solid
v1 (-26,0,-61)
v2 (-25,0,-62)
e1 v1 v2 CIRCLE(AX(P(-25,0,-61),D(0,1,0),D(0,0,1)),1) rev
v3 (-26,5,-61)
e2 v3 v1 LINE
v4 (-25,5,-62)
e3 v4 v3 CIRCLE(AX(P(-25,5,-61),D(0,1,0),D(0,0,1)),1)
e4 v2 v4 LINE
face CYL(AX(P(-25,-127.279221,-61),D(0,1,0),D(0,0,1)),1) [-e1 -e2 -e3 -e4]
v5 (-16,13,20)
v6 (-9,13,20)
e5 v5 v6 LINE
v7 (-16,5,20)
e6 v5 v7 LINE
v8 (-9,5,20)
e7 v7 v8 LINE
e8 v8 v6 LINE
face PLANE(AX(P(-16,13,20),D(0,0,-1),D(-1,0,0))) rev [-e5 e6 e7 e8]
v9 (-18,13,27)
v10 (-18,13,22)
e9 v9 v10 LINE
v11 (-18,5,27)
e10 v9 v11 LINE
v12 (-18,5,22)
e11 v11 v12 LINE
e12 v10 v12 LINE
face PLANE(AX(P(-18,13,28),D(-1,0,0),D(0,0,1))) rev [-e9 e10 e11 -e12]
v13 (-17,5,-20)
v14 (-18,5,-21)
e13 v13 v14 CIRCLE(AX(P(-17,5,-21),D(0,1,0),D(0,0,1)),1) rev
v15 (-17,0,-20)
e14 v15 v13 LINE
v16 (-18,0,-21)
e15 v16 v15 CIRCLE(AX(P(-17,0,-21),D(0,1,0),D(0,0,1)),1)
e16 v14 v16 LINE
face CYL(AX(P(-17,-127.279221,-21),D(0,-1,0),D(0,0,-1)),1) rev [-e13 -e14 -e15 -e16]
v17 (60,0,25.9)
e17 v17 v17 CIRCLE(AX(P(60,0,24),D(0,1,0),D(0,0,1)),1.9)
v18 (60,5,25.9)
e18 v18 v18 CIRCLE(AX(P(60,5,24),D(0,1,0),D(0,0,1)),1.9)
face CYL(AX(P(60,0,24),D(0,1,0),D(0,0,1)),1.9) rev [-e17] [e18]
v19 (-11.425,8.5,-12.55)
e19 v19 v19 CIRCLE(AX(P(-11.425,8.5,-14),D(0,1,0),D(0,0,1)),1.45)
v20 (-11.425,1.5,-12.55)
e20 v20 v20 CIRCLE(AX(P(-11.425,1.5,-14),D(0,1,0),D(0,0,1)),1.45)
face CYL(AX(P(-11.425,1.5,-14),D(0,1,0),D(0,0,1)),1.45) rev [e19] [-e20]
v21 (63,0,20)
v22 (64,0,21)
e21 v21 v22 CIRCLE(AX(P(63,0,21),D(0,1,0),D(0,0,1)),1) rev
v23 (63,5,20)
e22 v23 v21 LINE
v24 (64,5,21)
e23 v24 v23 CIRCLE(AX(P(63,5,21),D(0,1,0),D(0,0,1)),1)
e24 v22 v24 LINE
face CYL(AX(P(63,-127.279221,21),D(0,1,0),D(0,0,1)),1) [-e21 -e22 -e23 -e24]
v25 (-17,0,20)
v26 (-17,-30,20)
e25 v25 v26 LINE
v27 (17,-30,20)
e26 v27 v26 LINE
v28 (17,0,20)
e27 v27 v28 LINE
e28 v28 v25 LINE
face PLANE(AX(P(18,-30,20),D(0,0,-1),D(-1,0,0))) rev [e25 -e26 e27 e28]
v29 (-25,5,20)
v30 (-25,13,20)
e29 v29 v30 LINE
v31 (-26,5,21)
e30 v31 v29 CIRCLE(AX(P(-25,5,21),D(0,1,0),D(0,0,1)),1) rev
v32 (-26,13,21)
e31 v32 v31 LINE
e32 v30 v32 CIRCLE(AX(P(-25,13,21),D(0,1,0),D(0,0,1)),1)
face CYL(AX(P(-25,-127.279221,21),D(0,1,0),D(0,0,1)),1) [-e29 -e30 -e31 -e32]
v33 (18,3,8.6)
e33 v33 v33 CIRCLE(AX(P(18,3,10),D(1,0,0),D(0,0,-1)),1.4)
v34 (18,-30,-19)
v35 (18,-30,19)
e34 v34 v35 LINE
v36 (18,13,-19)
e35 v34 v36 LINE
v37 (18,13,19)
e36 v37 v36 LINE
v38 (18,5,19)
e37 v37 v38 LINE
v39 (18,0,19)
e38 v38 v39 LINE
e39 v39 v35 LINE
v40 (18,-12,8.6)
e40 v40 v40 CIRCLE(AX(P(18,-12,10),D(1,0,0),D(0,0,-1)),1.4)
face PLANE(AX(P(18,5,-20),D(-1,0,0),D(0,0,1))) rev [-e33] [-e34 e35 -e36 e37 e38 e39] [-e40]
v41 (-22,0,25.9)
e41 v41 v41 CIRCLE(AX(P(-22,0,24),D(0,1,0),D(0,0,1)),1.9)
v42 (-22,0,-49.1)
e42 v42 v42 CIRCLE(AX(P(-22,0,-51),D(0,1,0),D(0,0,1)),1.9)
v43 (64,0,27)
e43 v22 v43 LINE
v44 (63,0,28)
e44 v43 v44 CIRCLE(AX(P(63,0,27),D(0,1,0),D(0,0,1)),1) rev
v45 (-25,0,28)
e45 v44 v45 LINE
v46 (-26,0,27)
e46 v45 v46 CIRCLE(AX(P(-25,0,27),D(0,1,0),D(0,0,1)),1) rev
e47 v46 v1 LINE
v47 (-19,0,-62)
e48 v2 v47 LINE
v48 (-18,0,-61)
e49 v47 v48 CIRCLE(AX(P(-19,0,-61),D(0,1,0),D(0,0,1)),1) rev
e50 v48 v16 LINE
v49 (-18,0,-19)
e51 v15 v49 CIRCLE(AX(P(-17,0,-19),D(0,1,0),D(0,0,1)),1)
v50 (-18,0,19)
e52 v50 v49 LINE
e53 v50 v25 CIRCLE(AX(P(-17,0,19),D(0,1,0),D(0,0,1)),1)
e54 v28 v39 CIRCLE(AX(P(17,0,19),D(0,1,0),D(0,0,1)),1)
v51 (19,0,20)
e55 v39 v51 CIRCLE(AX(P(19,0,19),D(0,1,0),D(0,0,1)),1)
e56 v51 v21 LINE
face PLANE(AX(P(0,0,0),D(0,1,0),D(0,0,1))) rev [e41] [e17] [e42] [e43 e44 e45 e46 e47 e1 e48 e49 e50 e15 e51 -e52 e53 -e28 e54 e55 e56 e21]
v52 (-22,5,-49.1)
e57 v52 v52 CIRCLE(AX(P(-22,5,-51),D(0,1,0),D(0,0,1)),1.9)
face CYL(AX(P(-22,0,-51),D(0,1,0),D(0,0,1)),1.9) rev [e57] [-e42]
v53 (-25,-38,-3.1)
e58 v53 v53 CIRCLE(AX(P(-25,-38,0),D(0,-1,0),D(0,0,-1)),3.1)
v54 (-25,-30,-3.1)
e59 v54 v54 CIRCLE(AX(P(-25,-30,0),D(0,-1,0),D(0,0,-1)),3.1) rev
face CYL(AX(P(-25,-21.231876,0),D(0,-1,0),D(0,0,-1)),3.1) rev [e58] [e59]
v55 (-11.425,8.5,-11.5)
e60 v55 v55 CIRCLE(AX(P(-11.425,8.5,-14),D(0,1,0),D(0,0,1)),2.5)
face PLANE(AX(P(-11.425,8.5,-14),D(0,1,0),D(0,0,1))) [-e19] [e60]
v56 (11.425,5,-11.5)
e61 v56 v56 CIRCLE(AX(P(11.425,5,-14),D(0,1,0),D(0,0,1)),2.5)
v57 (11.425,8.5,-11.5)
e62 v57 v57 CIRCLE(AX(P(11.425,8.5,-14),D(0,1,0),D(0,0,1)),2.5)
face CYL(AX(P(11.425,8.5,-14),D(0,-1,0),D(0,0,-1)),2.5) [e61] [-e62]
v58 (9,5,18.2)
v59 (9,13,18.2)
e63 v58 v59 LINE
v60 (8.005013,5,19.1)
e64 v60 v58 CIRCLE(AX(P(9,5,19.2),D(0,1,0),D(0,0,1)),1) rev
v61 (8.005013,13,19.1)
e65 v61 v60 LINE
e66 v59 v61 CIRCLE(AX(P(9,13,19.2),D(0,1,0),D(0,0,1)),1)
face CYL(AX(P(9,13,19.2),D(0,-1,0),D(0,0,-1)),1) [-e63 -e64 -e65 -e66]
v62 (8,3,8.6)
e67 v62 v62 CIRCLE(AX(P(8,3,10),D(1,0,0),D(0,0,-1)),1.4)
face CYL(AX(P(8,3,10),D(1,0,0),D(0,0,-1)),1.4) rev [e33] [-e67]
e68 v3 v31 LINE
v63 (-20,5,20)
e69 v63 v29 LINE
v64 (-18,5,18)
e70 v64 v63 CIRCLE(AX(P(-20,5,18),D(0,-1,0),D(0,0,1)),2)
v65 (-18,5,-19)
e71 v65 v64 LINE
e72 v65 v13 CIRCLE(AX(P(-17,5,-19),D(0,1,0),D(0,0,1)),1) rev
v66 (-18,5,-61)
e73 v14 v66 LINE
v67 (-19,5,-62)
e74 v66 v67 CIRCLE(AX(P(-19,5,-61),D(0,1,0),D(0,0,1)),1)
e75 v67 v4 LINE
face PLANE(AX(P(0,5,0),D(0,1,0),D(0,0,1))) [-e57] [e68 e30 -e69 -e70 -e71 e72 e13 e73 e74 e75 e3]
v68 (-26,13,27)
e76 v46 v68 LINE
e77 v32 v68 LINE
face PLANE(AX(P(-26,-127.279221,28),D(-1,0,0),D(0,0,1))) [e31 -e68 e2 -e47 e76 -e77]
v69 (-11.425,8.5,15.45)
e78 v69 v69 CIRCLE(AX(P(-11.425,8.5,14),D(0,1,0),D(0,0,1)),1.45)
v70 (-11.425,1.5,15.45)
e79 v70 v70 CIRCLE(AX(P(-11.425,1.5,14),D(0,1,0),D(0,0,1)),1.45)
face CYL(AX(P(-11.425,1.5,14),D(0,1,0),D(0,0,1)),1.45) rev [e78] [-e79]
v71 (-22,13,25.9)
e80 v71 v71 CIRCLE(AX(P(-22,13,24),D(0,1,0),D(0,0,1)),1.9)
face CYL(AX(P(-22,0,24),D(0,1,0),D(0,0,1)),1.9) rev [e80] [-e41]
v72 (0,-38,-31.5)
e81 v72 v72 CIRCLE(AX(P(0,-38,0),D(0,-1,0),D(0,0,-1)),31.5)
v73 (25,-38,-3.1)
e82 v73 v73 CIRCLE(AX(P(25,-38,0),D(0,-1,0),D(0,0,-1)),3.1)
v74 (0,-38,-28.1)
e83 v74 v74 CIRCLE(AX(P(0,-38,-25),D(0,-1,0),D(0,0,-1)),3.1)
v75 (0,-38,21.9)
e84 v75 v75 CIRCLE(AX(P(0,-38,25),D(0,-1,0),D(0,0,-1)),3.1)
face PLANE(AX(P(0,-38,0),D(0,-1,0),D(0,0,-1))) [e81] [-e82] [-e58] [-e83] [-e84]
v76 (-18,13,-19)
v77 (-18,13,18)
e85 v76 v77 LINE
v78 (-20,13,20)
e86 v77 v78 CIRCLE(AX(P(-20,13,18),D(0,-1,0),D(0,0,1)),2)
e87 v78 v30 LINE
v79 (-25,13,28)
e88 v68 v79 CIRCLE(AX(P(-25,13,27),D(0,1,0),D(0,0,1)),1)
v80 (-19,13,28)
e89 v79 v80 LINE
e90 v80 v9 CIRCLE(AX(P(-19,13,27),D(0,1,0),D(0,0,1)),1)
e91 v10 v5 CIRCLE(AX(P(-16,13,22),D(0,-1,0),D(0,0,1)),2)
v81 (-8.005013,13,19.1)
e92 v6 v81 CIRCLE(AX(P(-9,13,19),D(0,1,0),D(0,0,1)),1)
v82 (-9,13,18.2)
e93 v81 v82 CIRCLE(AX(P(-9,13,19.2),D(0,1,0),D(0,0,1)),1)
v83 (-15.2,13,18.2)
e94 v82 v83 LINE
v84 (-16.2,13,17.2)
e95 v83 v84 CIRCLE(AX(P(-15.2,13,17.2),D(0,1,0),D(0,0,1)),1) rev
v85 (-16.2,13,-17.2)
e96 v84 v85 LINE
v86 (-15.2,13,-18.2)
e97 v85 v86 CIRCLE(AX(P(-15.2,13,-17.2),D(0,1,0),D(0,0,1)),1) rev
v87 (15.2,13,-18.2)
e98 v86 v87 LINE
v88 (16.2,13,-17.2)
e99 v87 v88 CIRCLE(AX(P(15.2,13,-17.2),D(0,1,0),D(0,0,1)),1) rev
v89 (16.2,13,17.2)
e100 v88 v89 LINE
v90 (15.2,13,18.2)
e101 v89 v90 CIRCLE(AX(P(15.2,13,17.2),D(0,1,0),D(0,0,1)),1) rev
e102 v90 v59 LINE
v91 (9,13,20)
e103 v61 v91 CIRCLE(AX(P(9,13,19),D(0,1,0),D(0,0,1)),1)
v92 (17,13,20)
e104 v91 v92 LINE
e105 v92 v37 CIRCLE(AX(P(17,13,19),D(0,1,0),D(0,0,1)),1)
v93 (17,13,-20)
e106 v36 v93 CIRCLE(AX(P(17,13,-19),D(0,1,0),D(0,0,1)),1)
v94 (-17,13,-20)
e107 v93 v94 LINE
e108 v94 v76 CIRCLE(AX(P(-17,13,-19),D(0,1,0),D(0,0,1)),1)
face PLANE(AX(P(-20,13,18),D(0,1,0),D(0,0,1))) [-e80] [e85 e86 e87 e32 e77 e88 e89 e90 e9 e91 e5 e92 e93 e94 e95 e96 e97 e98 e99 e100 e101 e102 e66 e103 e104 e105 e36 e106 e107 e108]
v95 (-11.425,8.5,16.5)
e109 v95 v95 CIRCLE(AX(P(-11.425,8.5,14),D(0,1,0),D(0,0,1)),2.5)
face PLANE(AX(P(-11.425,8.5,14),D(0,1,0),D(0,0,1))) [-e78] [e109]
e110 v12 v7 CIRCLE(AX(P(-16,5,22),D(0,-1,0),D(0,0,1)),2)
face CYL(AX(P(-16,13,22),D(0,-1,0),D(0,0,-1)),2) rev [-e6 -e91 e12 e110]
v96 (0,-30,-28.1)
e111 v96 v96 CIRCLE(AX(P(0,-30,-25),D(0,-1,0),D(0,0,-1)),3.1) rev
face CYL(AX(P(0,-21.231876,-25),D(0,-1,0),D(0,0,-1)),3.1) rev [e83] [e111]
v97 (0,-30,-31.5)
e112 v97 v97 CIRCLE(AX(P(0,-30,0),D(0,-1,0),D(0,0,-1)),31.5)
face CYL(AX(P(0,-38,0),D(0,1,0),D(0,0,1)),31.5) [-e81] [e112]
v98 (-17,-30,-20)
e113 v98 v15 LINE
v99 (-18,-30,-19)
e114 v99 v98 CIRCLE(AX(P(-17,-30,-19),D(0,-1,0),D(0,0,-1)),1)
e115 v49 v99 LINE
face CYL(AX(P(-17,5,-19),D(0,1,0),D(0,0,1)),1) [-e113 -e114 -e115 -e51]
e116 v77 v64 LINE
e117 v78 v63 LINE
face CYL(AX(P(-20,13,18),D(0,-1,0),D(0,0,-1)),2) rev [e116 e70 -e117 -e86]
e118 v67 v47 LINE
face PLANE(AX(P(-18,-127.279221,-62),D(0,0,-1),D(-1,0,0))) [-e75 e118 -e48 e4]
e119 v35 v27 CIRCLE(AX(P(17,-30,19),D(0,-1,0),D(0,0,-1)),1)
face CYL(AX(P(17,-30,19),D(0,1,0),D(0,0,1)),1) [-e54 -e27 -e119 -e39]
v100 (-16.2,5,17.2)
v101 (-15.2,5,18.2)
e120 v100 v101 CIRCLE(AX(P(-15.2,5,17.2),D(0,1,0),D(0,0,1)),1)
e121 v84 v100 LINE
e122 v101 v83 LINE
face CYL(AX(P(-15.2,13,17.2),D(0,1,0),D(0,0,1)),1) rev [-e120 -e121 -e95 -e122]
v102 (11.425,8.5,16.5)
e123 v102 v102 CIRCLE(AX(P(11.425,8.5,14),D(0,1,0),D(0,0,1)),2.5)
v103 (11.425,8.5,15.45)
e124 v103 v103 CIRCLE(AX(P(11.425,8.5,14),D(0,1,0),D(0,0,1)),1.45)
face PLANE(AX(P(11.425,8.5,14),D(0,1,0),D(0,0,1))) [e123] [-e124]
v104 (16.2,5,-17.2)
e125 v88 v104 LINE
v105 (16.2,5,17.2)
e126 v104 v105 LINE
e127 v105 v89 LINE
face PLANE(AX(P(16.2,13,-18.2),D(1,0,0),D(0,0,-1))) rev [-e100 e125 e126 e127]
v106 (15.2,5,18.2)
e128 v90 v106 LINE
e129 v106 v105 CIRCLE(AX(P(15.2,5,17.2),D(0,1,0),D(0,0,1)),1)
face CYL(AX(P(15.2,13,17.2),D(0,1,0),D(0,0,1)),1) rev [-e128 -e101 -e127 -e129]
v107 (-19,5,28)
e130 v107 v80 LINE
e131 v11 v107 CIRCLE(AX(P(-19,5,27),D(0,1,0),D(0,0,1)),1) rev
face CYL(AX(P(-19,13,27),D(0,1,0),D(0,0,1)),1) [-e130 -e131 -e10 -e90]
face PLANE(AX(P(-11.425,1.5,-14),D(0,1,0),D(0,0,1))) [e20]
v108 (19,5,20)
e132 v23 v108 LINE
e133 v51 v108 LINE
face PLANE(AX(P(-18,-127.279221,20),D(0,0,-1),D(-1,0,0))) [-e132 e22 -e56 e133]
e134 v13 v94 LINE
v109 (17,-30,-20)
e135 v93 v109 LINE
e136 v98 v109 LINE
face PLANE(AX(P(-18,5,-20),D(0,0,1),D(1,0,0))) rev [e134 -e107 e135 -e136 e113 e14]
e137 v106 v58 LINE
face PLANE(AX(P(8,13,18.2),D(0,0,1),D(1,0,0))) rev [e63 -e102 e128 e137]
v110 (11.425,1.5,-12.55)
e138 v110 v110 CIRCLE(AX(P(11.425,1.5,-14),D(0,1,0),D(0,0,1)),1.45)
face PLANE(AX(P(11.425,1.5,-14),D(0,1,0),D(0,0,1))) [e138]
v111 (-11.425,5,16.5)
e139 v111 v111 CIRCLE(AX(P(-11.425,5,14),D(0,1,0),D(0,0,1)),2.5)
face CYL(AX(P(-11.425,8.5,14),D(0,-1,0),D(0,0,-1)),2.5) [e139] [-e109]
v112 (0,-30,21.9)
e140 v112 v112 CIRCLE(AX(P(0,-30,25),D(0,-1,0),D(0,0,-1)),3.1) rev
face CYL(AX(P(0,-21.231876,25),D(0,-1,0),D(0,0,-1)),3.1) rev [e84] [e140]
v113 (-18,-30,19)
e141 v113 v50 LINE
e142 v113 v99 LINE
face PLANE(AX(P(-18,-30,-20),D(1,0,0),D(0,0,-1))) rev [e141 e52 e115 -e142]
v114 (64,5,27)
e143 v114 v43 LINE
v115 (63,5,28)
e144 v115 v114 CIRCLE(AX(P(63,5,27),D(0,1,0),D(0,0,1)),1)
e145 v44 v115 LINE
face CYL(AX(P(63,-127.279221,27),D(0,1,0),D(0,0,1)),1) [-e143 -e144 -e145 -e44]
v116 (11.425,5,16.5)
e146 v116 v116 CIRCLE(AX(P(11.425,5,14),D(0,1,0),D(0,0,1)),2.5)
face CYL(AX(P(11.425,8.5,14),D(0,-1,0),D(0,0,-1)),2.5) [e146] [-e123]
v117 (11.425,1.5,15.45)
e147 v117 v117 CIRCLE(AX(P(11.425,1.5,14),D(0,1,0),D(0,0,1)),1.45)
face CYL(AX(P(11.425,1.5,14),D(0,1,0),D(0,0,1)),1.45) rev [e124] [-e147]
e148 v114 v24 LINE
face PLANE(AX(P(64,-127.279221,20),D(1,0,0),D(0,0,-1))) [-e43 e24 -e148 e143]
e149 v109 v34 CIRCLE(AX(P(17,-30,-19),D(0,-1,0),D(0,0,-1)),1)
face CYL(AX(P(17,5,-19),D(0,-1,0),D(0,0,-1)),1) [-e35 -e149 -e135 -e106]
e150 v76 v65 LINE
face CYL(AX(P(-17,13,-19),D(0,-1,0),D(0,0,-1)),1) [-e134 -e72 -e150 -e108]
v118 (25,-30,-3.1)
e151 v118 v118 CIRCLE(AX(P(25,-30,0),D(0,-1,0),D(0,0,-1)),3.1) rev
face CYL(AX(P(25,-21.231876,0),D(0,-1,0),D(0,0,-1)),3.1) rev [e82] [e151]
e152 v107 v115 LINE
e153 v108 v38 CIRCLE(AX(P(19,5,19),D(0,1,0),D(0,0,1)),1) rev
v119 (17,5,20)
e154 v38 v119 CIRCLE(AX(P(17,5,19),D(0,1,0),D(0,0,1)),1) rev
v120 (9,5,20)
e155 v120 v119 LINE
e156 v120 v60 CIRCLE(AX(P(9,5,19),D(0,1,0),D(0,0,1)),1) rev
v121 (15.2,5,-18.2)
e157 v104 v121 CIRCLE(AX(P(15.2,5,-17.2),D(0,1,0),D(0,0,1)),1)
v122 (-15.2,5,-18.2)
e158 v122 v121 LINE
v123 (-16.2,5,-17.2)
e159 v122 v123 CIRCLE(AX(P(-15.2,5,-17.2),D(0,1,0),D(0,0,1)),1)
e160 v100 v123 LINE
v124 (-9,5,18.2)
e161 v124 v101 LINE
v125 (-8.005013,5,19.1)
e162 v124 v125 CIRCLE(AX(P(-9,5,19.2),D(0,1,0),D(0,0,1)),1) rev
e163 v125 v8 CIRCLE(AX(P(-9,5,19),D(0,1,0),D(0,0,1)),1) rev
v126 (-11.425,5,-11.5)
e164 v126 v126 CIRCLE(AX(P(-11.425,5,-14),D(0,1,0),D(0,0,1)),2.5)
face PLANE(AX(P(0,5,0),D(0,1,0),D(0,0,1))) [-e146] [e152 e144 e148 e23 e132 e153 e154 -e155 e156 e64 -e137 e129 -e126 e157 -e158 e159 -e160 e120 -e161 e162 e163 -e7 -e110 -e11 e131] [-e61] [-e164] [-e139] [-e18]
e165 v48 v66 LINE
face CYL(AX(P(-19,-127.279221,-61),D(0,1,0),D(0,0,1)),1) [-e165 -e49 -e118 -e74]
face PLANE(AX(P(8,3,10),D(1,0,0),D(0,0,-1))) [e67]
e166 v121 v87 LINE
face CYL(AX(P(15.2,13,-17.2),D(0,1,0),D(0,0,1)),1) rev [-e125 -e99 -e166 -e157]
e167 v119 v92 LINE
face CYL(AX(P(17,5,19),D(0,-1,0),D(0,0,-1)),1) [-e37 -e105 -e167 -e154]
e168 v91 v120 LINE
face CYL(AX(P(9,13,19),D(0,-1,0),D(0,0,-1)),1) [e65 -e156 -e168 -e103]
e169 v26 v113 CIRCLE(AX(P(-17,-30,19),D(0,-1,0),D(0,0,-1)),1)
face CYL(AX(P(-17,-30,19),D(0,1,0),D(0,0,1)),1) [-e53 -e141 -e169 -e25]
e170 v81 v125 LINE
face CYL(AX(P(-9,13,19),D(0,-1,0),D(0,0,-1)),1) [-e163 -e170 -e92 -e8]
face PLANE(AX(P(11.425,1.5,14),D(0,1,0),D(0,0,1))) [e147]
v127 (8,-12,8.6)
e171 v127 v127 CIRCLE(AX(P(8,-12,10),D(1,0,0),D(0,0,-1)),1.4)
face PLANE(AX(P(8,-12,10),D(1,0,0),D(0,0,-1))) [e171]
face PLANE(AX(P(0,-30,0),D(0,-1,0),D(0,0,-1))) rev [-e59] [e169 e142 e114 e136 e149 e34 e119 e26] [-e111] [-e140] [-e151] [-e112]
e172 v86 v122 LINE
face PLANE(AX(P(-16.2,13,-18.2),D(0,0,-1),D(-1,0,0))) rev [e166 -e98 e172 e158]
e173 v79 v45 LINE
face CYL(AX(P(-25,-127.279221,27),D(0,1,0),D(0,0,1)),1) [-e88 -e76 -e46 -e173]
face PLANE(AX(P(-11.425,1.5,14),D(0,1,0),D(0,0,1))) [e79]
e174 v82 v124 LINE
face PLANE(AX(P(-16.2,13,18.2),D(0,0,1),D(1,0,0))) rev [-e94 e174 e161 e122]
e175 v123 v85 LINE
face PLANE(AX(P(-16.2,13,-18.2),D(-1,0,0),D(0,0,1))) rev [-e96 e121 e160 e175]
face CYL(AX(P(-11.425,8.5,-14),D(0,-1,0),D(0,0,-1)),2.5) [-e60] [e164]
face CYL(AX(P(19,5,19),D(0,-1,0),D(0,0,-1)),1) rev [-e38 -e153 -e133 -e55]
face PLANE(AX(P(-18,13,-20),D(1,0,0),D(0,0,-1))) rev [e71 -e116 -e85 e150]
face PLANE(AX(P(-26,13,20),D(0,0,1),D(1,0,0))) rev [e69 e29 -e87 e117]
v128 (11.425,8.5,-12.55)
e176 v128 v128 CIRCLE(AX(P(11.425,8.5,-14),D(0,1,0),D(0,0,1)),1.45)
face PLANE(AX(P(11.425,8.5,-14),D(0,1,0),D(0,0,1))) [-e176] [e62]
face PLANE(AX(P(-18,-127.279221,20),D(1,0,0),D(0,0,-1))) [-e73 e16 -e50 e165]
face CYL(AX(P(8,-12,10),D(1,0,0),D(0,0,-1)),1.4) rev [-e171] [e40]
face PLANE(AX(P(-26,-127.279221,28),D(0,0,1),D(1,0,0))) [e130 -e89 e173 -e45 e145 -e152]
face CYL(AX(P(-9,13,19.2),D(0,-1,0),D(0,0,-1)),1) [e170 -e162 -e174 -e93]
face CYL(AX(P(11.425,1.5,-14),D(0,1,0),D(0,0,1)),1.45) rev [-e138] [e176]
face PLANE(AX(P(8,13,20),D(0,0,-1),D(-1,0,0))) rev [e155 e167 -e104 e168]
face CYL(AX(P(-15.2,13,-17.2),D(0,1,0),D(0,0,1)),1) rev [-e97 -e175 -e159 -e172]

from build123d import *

# Parameters (mm, degrees)
SKETCH1_W           = 36
SKETCH1_H           = 40
BOSS_EXTRUDE1_DEPTH = 5
BOSS_EXTRUDE2_DEPTH = 5
BOSS_EXTRUDE4_DEPTH = 8
FILLET1_R           = 1
FILLET2_R           = 1
FILLET3_R           = 1
SKETCH4_R           = 1.9
CUT_EXTRUDE1_DEPTH  = 91.049986119
SKETCH5_R           = 2.5
BOSS_EXTRUDE5_DEPTH = 3.5
SKETCH6_R           = 1.45
CUT_EXTRUDE2_DEPTH  = 7
SKETCH7_W           = 36
SKETCH7_H           = 40
BOSS_EXTRUDE6_DEPTH = 30
SKETCH8_R           = 31.5
BOSS_EXTRUDE7_DEPTH = 8
SKETCH9_R           = 3.1
CUT_EXTRUDE3_DEPTH  = 8
FILLET5_R           = 1
FILLET6_R           = 1
SKETCH10_R          = 1.4
CUT_EXTRUDE4_DEPTH  = 10


with BuildPart() as part:
    # Sketch1 → Boss-Extrude1 (new body)
    with BuildSketch(Plane(origin=(0, 0, 0), x_dir=(1, 0, 0), z_dir=(0, 1, 0))):
        Rectangle(SKETCH1_W, SKETCH1_H)
    extrude(amount=BOSS_EXTRUDE1_DEPTH)

    # Sketch2 → Boss-Extrude2 (add)
    with BuildSketch(Plane(origin=(0, 5, 0), x_dir=(1, 0, 0), z_dir=(0, 1, 0))):
        Polygon((-18, -20), (-18, 62), (-26, 62), (-26, -28), (64, -28), (64, -20), align=None)
    extrude(amount=-BOSS_EXTRUDE2_DEPTH)

    # Sketch3 → Boss-Extrude4 (add)
    with BuildSketch(Plane(origin=(0, 5, 0), x_dir=(1, 0, 0), z_dir=(0, 1, 0))):
        with BuildLine():
            Line((-18, 20), (18, 20))
            Line((18, 20), (18, -20))
            Line((18, -20), (8, -20))
            Line((8, -20), (8, -18.2))
            Line((8, -18.2), (16.2, -18.2))
            Line((16.2, -18.2), (16.2, 18.2))
            Line((16.2, 18.2), (-16.2, 18.2))
            Line((-16.2, 18.2), (-16.2, -18.2))
            Line((-16.2, -18.2), (-8, -18.2))
            Line((-8, -18.2), (-8, -20))
            Line((-8, -20), (-16, -20))
            ThreePointArc((-16, -20), (-17.414213562, -20.585786438), (-18, -22))
            Line((-18, -22), (-18, -28))
            Line((-18, -28), (-26, -28))
            Line((-26, -28), (-26, -20))
            Line((-26, -20), (-20, -20))
            ThreePointArc((-20, -20), (-18.585786438, -19.414213562), (-18, -18))
            Line((-18, -18), (-18, 20))
        make_face()
    extrude(amount=BOSS_EXTRUDE4_DEPTH)

    # Fillet1
    # the kernel refuses this fillet: 1 mm, written as the material it adds along each edge
    with BuildSketch(Plane(origin=(16.2, 2.5, 18.2), x_dir=(0, 0, -1), z_dir=(0, 1, 0)), Plane(origin=(16.2, 2.5, -18.2), x_dir=(-1, 0, 0), z_dir=(0, 1, 0)), Plane(origin=(-16.2, 2.5, -18.2), x_dir=(0, 0, 1), z_dir=(0, 1, 0)), Plane(origin=(-16.2, 2.5, 18.2), x_dir=(1, 0, 0), z_dir=(0, 1, 0))) as fillet1_piece_1:
        with BuildLine():
            CenterArc((FILLET1_R, FILLET1_R), FILLET1_R, 180, 90)
            Line((0, FILLET1_R), (0, 0))
            Line((0, 0), (FILLET1_R, 0))
        make_face()
    extrude(amount=10.5)
    # the kernel refuses this fillet: 1 mm, written as the material it takes off along each edge
    with BuildSketch(Plane(origin=(-26, 15.5, 28), x_dir=(1, 0, 0), z_dir=(0, -1, 0))) as fillet1_2_piece_1:
        with BuildLine():
            CenterArc((FILLET1_R, -FILLET1_R), FILLET1_R, 90, 90)
            Line((0, -FILLET1_R), (0, 0))
            Line((0, 0), (FILLET1_R, 0))
        make_face()
    extrude(amount=18, mode=Mode.SUBTRACT)
    with BuildSketch(Plane(origin=(-26, 5, 20), x_dir=(0, 0, 1), z_dir=(0, 1, 0)), Plane(origin=(-18, 5, 28), x_dir=(0, 0, -1), z_dir=(0, 1, 0)), Plane(origin=(8, 5, 20), x_dir=(1, 0, 0), z_dir=(0, 1, 0)), Plane(origin=(8, 5, 18.2), x_dir=(0, 0, 1), z_dir=(0, 1, 0)), Plane(origin=(-8, 5, 18.2), x_dir=(-1, 0, 0), z_dir=(0, 1, 0)), Plane(origin=(-8, 5, 20), x_dir=(0, 0, -1), z_dir=(0, 1, 0))) as fillet1_2_piece_2:
        with BuildLine():
            CenterArc((FILLET1_R, FILLET1_R), FILLET1_R, 180, 90)
            Line((0, FILLET1_R), (0, 0))
            Line((0, 0), (FILLET1_R, 0))
        make_face()
    extrude(amount=10.5, mode=Mode.SUBTRACT)

    # Fillet2
    fillet2_edges = [part.edges().sort_by_distance(p)[0] for p in [
        (-18, 9, -20),
        (18, 9, 20),
    ]]
    fillet(fillet2_edges, radius=FILLET2_R)

    # Fillet3
    fillet3_edges = [part.edges().sort_by_distance(p)[0] for p in [
        (-18, 2.5, -62),
        (64, 2.5, 20),
        (64, 2.5, 28),
        (-26, 2.5, -62),
    ]]
    fillet(fillet3_edges, radius=FILLET3_R)

    # Sketch4 → Cut-Extrude1 (cut, through all)
    with BuildSketch(Plane(origin=(0, 13, 0), x_dir=(1, 0, 0), z_dir=(0, 1, 0))):
        with Locations(Location((-22, -24, 0), (0, 0, 270))):
            Circle(SKETCH4_R)
        with Locations(Location((-22, 51, 0), (0, 0, 270))):
            Circle(SKETCH4_R)
        with Locations(Location((60, -24, 0), (0, 0, 270))):
            Circle(SKETCH4_R)
    extrude(amount=-CUT_EXTRUDE1_DEPTH, mode=Mode.SUBTRACT)

    # Sketch5 → Boss-Extrude5 (add)
    with BuildSketch(Plane(origin=(0, 5, 0), x_dir=(1, 0, 0), z_dir=(0, 1, 0))):
        with Locations(Location((-11.425, 14, 0), (0, 0, 270))):
            Circle(SKETCH5_R)
        with Locations(Location((11.425, 14, 0), (0, 0, 270))):
            Circle(SKETCH5_R)
        with Locations(Location((11.425, -14, 0), (0, 0, 270))):
            Circle(SKETCH5_R)
        with Locations(Location((-11.425, -14, 0), (0, 0, 270))):
            Circle(SKETCH5_R)
    extrude(amount=BOSS_EXTRUDE5_DEPTH)

    # Sketch6 → Cut-Extrude2 (cut)
    with BuildSketch(Plane(origin=(0, 8.5, 0), x_dir=(1, 0, 0), z_dir=(0, 1, 0))):
        with Locations(Location((-11.425, 14, 0), (0, 0, 270))):
            Circle(SKETCH6_R)
        with Locations(Location((11.425, 14, 0), (0, 0, 270))):
            Circle(SKETCH6_R)
        with Locations(Location((11.425, -14, 0), (0, 0, 270))):
            Circle(SKETCH6_R)
        with Locations(Location((-11.425, -14, 0), (0, 0, 270))):
            Circle(SKETCH6_R)
    extrude(amount=-CUT_EXTRUDE2_DEPTH, mode=Mode.SUBTRACT)

    # Sketch7 → Boss-Extrude6 (add)
    with BuildSketch(Plane.XZ):
        Rectangle(SKETCH7_W, SKETCH7_H)
    extrude(amount=BOSS_EXTRUDE6_DEPTH)

    # Sketch8 → Boss-Extrude7 (add)
    with BuildSketch(Plane.XZ.offset(30)):
        with Locations(Location((0, 0, 0), (0, 0, 270))):
            Circle(SKETCH8_R)
    extrude(amount=BOSS_EXTRUDE7_DEPTH)

    # Sketch9 → Cut-Extrude3 (cut)
    with BuildSketch(Plane.XZ.offset(38)):
        with Locations(Location((0, 25, 0), (0, 0, 270))):
            Circle(SKETCH9_R)
        with Locations(Location((-25, 0, 0), (0, 0, 270))):
            Circle(SKETCH9_R)
        with Locations(Location((25, 0, 0), (0, 0, 270))):
            Circle(SKETCH9_R)
        with Locations(Location((0, -25, 0), (0, 0, 270))):
            Circle(SKETCH9_R)
    extrude(amount=-CUT_EXTRUDE3_DEPTH, mode=Mode.SUBTRACT)

    # Fillet5
    fillet5_edges = [part.edges().sort_by_distance(p)[0] for p in [
        (-18, -15, 20),
        (-18, -15, -20),
        (18, -15, 20),
        (18, -8.5, -20),
    ]]
    fillet(fillet5_edges, radius=FILLET5_R)

    # Fillet6
    fillet6_edges = [part.edges().sort_by_distance(p)[0] for p in [
        (-18, 2.5, -20),
        (18, 2.5, 20),
    ]]
    fillet(fillet6_edges, radius=FILLET6_R)

    # Sketch10 → Cut-Extrude4 (cut)
    with BuildSketch(Plane(origin=(18, 0, 0), x_dir=(0, 0, -1), z_dir=(1, 0, 0))):
        with Locations((-10, -12)):
            Circle(SKETCH10_R)
        with Locations((-10, 3)):
            Circle(SKETCH10_R)
    extrude(amount=-CUT_EXTRUDE4_DEPTH, mode=Mode.SUBTRACT)


solid = part.part
